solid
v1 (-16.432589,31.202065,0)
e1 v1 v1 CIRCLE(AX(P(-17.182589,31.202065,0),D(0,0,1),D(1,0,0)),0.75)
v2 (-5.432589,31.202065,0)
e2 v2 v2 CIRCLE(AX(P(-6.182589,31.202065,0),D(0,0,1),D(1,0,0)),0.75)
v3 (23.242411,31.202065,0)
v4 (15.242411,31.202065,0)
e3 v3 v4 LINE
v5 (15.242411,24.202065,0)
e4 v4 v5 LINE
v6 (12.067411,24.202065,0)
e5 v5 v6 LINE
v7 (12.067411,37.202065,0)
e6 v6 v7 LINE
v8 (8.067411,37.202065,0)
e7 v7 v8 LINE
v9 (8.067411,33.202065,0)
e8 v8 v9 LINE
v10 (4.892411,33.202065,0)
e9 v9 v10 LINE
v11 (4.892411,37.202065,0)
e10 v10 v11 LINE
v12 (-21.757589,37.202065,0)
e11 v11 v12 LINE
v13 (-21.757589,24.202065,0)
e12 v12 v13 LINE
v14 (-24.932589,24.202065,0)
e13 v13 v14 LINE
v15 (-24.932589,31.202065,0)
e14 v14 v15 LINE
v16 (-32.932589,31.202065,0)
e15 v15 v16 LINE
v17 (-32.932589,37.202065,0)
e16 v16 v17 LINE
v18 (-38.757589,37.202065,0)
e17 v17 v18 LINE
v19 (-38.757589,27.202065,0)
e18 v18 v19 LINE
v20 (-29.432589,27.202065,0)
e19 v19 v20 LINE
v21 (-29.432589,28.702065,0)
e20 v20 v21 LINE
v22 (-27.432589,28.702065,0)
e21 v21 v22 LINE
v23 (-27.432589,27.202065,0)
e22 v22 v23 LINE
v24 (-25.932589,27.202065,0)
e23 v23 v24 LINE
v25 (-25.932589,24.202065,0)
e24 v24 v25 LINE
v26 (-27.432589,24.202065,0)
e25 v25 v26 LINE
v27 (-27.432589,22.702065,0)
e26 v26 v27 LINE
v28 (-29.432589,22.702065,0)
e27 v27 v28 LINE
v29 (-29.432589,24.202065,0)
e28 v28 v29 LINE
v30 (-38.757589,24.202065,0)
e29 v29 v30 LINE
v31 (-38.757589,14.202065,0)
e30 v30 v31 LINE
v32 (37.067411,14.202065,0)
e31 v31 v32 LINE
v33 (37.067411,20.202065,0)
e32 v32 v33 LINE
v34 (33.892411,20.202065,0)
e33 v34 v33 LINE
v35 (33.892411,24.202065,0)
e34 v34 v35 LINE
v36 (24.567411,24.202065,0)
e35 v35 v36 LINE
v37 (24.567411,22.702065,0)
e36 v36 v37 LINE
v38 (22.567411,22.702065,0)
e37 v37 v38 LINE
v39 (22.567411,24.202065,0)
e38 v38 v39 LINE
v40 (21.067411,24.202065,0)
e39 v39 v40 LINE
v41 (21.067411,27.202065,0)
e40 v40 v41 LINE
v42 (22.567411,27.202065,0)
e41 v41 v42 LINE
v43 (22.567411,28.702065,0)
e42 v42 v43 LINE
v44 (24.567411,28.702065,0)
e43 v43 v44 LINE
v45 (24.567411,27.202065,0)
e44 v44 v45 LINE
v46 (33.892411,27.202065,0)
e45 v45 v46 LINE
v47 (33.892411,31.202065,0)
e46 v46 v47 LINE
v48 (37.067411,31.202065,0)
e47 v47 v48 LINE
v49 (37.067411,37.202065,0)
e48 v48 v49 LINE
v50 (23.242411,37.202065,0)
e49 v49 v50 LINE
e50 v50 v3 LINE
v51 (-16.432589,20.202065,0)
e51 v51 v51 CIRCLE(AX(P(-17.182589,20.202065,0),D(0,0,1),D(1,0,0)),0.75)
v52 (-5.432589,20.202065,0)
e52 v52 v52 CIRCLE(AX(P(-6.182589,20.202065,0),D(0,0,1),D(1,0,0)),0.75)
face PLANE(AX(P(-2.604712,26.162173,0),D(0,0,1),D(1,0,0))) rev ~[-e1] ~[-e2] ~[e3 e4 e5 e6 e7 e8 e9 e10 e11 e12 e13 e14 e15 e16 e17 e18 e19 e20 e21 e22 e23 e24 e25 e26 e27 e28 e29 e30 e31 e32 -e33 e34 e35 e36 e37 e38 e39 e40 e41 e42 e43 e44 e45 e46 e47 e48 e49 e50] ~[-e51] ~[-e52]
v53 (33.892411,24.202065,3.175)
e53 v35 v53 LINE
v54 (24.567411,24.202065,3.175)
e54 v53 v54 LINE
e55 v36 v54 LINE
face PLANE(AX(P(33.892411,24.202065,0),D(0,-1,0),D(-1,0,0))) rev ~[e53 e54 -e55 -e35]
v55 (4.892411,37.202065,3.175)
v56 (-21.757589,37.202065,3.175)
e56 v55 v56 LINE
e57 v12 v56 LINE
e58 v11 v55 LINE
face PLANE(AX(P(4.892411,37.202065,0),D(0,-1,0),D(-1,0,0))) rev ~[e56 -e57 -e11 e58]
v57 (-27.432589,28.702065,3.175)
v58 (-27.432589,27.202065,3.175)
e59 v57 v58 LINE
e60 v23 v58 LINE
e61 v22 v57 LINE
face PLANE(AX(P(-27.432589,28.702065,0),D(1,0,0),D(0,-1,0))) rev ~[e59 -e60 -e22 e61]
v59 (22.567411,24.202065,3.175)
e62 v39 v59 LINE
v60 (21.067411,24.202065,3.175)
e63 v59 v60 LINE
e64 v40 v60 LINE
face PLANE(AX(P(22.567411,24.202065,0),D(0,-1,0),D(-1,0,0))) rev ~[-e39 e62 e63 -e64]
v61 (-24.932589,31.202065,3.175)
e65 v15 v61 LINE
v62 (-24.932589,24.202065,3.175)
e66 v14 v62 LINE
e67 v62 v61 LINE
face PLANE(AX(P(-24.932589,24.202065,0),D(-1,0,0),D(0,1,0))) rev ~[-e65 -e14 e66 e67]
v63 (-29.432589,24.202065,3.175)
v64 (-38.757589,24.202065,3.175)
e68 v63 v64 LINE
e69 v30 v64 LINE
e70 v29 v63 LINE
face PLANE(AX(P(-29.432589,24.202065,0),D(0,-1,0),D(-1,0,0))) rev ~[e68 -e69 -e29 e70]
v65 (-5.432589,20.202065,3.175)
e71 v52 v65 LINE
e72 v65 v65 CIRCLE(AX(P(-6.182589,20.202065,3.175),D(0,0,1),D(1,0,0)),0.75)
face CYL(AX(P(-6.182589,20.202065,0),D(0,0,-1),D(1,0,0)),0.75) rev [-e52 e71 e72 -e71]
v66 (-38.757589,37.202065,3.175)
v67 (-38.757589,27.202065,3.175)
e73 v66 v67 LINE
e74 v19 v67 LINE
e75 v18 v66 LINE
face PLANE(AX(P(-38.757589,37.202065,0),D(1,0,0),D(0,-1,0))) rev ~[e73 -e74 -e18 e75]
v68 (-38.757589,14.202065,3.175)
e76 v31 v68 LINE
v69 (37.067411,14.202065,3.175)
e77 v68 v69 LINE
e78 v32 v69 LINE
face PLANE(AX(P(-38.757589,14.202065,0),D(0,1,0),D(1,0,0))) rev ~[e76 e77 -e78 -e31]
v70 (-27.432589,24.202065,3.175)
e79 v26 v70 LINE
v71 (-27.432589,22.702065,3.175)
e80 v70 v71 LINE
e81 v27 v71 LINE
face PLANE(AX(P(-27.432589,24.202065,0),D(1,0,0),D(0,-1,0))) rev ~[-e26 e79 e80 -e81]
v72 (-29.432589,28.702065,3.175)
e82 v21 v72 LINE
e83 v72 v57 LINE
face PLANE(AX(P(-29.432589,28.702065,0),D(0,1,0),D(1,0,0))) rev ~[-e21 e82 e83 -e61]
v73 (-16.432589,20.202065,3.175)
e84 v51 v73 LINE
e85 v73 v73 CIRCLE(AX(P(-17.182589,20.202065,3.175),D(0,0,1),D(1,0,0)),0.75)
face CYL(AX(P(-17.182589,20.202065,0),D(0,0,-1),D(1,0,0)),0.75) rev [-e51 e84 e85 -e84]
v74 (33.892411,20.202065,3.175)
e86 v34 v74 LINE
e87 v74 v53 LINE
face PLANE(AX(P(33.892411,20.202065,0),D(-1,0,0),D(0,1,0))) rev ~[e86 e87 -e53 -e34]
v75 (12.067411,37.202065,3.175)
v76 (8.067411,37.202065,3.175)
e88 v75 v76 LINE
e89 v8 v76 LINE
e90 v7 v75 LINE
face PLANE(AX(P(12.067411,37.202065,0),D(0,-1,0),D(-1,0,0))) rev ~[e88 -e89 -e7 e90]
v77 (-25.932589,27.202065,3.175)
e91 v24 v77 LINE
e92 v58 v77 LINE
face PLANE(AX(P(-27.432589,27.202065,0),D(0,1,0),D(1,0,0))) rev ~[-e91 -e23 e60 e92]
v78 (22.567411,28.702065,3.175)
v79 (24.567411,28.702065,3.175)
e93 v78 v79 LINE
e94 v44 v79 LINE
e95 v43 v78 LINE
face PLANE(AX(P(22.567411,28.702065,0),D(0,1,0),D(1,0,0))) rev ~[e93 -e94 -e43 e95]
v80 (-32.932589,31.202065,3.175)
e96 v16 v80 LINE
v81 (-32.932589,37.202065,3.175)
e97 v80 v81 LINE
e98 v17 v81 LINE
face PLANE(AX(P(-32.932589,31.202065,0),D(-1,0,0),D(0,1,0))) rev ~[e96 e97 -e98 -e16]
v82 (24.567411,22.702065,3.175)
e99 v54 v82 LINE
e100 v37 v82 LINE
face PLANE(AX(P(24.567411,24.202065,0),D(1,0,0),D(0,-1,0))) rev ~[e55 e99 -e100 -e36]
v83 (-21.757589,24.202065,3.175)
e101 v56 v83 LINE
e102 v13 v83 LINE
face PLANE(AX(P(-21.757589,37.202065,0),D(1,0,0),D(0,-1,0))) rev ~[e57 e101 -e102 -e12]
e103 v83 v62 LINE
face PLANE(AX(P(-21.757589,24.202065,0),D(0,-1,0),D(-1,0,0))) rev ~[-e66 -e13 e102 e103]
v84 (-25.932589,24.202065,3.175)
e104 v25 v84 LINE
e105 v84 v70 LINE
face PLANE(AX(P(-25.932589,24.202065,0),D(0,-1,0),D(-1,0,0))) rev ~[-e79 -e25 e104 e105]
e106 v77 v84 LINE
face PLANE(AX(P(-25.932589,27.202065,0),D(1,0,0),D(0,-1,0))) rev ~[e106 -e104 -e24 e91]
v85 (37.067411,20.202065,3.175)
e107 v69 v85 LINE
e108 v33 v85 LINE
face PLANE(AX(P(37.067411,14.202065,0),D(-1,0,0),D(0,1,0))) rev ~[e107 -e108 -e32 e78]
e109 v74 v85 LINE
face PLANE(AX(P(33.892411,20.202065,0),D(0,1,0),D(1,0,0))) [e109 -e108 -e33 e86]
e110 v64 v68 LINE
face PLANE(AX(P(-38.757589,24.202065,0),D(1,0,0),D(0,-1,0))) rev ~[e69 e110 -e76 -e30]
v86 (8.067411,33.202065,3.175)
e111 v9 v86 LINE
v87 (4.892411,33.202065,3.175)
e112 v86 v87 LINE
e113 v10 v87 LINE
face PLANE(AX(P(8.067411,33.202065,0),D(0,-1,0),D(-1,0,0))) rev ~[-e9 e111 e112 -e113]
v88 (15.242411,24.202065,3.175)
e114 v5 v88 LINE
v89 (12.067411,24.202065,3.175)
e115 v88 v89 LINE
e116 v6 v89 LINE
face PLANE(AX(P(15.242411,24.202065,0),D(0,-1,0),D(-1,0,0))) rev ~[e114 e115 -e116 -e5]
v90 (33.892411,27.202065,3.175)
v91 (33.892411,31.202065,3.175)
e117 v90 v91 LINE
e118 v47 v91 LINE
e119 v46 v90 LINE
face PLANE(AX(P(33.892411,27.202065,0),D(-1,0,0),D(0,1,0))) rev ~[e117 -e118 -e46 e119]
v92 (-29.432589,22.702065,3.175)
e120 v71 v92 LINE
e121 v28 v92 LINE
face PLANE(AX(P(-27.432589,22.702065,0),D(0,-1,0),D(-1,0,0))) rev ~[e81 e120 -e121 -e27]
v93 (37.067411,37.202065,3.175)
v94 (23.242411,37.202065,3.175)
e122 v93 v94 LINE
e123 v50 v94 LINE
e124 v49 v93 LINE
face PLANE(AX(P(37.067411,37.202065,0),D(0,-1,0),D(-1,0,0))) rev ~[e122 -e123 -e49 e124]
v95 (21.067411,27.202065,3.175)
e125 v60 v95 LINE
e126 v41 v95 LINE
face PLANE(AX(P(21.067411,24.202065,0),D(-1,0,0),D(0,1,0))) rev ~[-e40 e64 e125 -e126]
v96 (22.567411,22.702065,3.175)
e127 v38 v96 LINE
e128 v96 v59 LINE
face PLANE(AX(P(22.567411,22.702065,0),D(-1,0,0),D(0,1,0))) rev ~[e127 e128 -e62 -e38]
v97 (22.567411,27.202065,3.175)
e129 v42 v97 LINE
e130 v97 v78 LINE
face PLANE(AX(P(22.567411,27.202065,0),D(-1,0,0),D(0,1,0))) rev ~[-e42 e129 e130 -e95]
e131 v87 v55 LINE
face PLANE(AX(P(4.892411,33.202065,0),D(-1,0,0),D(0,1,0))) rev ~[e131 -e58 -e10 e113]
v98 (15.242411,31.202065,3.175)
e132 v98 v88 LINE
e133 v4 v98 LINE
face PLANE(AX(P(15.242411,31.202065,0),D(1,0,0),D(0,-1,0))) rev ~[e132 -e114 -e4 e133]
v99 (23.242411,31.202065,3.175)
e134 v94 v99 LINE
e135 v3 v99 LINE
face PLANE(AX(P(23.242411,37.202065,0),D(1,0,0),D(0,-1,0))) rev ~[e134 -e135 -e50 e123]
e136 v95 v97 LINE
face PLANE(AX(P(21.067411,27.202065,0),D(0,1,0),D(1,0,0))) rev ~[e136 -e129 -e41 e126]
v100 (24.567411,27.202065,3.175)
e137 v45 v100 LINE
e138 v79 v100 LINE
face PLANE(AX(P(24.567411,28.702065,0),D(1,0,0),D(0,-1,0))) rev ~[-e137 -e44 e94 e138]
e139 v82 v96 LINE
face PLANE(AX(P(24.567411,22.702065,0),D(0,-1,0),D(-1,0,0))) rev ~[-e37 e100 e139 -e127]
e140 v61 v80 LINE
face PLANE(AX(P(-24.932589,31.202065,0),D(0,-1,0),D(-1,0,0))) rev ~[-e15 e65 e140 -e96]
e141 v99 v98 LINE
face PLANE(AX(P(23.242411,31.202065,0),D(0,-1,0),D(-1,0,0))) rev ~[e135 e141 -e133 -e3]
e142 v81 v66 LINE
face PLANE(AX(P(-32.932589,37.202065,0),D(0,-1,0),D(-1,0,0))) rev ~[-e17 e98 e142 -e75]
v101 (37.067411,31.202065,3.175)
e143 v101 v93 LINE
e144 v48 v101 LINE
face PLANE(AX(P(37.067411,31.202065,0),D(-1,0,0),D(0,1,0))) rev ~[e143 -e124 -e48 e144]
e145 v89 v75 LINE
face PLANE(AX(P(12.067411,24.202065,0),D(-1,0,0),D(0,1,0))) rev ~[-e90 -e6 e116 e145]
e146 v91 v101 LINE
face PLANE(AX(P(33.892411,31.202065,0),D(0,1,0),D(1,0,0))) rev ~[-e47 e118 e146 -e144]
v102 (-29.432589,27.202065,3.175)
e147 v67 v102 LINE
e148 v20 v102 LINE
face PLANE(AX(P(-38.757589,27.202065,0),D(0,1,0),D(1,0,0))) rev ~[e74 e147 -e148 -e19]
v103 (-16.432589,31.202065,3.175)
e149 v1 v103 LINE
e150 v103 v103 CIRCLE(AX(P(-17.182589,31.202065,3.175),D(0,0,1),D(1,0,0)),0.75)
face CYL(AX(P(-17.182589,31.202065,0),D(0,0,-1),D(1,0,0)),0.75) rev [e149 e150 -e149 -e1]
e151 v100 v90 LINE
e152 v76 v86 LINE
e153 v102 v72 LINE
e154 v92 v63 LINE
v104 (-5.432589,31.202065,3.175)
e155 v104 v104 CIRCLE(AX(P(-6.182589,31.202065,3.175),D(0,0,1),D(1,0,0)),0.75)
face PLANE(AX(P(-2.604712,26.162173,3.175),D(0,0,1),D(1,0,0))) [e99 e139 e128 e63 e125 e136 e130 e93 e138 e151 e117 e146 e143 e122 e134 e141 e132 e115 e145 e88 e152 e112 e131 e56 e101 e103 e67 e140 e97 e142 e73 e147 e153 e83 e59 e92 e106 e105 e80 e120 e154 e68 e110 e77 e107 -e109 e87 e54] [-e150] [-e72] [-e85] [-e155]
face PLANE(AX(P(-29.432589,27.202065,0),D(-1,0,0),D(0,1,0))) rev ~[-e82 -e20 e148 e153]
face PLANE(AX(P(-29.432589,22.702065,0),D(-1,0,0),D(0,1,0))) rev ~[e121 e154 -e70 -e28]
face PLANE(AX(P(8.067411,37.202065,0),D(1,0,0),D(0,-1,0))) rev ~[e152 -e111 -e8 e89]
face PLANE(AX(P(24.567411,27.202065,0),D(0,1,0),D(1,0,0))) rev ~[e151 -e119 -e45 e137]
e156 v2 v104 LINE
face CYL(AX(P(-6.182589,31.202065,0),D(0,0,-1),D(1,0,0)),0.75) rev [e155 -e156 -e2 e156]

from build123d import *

# Parameters (mm, degrees)
F0_R     = 0.75
F0_W     = 3.175
F0_H     = 6
F1_DEPTH = 3.175


# Not quite as in the source:
# - a length typed as a fraction of an inch, garbled in the dataset ("3 / 203.2 mm" for 3/8 in), is restored


with BuildPart() as f1:
    # F0 (on Top) → F1 (new body)
    with BuildSketch(Plane.XY):
        Polygon((21.0674113333, 24.2020648569), (21.0674113333, 27.2020648569), (22.5674113333, 27.2020648569), (22.5674113333, 28.7020648569), (24.5674113333, 28.7020648569), (24.5674113333, 27.2020648569), (33.8924113333, 27.2020648569), (33.8924113333, 31.2020648569), (33.8924113333, 37.2020648569), (23.2424113333, 37.2020648569), (23.2424113333, 31.2020648569), (15.2424113333, 31.2020648569), (15.2424113333, 24.2020648569), (12.0674113333, 24.2020648569), (12.0674113333, 37.2020648569), (8.0674113333, 37.2020648569), (8.0674113333, 33.2020648569), (4.8924113333, 33.2020648569), (4.8924113333, 37.2020648569), (-21.7575886667, 37.2020648569), (-21.7575886667, 24.2020648569), (-24.9325886667, 24.2020648569), (-24.9325886667, 31.2020648569), (-32.9325886667, 31.2020648569), (-32.9325886667, 37.2020648569), (-38.7575886667, 37.2020648569), (-38.7575886667, 31.2020648569), (-38.7575886667, 27.2020648569), (-29.4325886667, 27.2020648569), (-29.4325886667, 28.7020648569), (-27.4325886667, 28.7020648569), (-27.4325886667, 27.2020648569), (-25.9325886667, 27.2020648569), (-25.9325886667, 24.2020648569), (-27.4325886667, 24.2020648569), (-27.4325886667, 22.7020648569), (-29.4325886667, 22.7020648569), (-29.4325886667, 24.2020648569), (-38.7575886667, 24.2020648569), (-38.7575886667, 20.2020648569), (-38.7575886667, 14.2020648569), (33.8924113333, 14.2020648569), (33.8924113333, 20.2020648569), (33.8924113333, 24.2020648569), (24.5674113333, 24.2020648569), (24.5674113333, 22.7020648569), (22.5674113333, 22.7020648569), (22.5674113333, 24.2020648569), align=None)
        with Locations((-17.1825886667, 20.2020648569)):
            Circle(F0_R, mode=Mode.SUBTRACT)
        with Locations((-6.1825886667, 20.2020648569)):
            Circle(F0_R, mode=Mode.SUBTRACT)
        with Locations((-17.1825886667, 31.2020648569)):
            Circle(F0_R, mode=Mode.SUBTRACT)
        with Locations((-6.1825886667, 31.2020648569)):
            Circle(F0_R, mode=Mode.SUBTRACT)
        with Locations((35.4799113333, 34.2020648569)):
            Rectangle(F0_W, F0_H)
        with Locations((35.4799113333, 17.2020648569)):
            Rectangle(F0_W, F0_H)
    extrude(amount=F1_DEPTH)


solid = f1.part
